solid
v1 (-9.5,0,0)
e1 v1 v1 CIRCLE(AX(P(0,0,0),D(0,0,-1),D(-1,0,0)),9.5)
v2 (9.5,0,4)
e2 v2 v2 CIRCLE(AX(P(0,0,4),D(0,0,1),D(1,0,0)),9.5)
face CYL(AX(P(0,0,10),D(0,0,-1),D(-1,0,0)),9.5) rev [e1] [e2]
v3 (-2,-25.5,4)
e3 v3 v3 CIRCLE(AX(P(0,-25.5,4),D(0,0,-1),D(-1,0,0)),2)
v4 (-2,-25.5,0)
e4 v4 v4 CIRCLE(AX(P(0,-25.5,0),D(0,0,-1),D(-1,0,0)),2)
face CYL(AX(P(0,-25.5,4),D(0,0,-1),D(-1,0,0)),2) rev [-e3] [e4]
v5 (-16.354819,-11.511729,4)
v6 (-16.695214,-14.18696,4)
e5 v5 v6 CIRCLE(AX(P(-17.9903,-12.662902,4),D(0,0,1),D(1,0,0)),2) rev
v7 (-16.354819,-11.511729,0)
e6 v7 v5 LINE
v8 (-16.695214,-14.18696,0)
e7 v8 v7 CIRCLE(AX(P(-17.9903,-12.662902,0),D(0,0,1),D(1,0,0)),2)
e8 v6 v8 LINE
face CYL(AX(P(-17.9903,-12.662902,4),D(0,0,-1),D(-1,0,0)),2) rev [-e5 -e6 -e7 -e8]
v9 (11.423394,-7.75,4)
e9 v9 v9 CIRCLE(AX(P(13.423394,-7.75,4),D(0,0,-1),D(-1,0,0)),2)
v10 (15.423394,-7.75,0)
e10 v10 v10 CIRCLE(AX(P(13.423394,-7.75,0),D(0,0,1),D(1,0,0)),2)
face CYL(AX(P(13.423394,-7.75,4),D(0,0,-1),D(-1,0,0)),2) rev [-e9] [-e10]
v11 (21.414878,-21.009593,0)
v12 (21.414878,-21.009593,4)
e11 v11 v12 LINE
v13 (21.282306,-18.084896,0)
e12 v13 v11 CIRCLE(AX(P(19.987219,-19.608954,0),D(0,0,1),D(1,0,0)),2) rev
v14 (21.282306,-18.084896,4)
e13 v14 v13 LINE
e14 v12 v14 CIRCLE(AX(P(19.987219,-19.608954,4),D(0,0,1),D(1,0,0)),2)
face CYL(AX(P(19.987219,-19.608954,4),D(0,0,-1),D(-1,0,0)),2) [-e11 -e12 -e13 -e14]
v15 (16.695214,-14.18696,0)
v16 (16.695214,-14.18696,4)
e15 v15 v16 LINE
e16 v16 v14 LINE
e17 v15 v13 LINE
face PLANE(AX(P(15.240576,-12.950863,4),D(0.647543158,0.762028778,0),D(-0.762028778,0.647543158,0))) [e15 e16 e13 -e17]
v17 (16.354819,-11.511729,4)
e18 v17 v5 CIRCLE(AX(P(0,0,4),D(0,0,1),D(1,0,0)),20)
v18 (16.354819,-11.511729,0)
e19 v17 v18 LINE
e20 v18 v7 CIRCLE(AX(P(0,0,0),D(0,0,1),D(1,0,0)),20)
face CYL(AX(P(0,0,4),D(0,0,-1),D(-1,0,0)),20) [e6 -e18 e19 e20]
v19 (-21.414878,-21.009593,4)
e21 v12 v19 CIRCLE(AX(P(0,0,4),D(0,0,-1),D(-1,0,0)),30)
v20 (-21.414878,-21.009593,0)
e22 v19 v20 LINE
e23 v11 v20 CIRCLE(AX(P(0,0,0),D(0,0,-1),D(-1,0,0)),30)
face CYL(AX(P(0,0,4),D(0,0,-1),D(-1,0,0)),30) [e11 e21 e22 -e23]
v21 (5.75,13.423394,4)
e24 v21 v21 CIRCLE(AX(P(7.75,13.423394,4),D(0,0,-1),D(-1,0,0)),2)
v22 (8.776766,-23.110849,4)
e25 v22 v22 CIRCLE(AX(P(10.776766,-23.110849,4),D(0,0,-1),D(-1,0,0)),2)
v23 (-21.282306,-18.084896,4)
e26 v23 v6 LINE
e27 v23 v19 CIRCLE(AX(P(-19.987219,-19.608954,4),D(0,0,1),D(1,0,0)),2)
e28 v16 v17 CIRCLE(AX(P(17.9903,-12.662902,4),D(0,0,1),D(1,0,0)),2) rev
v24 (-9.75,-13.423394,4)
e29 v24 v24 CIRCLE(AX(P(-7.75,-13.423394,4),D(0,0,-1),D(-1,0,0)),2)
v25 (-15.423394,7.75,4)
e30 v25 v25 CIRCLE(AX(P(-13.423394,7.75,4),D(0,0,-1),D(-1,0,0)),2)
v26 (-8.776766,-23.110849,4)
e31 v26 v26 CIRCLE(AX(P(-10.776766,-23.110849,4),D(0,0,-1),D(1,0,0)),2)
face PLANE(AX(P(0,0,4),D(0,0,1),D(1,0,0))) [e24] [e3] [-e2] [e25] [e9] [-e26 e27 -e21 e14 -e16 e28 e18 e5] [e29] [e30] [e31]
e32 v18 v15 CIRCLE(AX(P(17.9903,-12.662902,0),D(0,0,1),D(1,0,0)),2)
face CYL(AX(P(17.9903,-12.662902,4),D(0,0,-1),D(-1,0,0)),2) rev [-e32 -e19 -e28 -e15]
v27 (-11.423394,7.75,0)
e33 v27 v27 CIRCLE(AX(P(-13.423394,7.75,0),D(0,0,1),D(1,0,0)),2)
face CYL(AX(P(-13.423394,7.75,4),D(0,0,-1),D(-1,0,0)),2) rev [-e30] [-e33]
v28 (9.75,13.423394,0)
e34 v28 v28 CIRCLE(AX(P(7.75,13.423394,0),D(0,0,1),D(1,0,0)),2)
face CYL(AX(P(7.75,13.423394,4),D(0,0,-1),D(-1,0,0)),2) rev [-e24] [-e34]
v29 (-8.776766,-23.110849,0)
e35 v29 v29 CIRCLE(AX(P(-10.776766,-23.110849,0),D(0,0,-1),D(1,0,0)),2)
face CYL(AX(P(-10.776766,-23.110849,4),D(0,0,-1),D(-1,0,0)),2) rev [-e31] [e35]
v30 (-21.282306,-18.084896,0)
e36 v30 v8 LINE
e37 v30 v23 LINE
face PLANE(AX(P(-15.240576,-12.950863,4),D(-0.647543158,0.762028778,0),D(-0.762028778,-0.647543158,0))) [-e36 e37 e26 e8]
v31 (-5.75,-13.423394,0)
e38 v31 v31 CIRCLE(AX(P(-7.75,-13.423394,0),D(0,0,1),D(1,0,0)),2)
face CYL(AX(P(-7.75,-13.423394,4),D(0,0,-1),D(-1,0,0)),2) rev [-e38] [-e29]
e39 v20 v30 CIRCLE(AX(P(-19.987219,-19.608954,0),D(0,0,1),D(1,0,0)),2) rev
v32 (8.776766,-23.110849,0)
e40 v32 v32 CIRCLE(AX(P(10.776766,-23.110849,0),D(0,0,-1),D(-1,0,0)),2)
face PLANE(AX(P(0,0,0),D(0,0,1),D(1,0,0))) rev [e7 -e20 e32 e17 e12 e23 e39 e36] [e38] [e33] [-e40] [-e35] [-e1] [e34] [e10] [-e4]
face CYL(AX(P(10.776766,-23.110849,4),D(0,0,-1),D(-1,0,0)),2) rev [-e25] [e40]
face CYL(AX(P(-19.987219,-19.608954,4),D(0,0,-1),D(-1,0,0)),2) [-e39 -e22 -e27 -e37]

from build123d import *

# Parameters (mm, degrees)
SKETCH_1_R           = 20
SKETCH_1_R_2         = 2
EXTRUDE_1_DEPTH      = 4
EXTRUDE_START        = -4
EXTRUDE_2_DEPTH      = 4
FILLET_2_R           = 5
FILLET_3_R           = 5
SKETCH_3_R           = 58.160089131
SKETCH_3_R_2         = 39.60449563
CUT_EXTRUDE_1_DEPTH  = 4
FILLET_4_R           = 8
EXTRUDE_3_DEPTH      = 4
SKETCH_5_R           = 2
CUT_EXTRUDE_2_DEPTH  = 4
SKETCH_6_R           = 2
CUT_EXTRUDE_3_DEPTH  = 10
EXTRUDE_4_DEPTH      = 4
EXTRUDE_6_DEPTH      = 4
CUT_EXTRUDE_6_DEPTH  = 4
FILLET_6_R           = 10
FILLET_7_R           = 10
FILLET_8_R           = 10
SKETCH_10_R          = 2
EXTRUDE_7_DEPTH      = 4
SKETCH_11_R          = 55.332509923
SKETCH_11_R_2        = 30
CUT_EXTRUDE_7_DEPTH  = 4
EXTRUDE_8_DEPTH      = 4
SKETCH_13_R          = 2
CUT_EXTRUDE_8_DEPTH  = 4
SKETCH_14_R          = 9.5
CUT_EXTRUDE_9_DEPTH  = 10
SKETCH_15_R          = 2
EXTRUDE_9_DEPTH      = 5
SKETCH_16_R          = 20
SKETCH_16_R_2        = 9.5
EXTRUDE_10_DEPTH     = 4
SKETCH_18_R          = 2
CUT_EXTRUDE_11_DEPTH = 39.776527497
FILLET_9_R           = 2
FILLET_10_R          = 2
CUT_EXTRUDE_START    = -5
SKETCH_19_R          = 2
CUT_EXTRUDE_12_DEPTH = 5


with BuildPart() as part:
    # 草图1 → 凸台-拉伸1 (new body)
    with BuildSketch(Plane.XY):
        Circle(SKETCH_1_R)
        with Locations((-15.5, 0)):
            Circle(SKETCH_1_R_2, mode=Mode.SUBTRACT)
        with Locations((15.5, 0)):
            Circle(SKETCH_1_R_2, mode=Mode.SUBTRACT)
        with Locations((-7.75, 13.423393759)):
            Circle(SKETCH_1_R_2, mode=Mode.SUBTRACT)
        with Locations((-7.75, -13.423393759)):
            Circle(SKETCH_1_R_2, mode=Mode.SUBTRACT)
        with Locations((7.75, -13.423393759)):
            Circle(SKETCH_1_R_2, mode=Mode.SUBTRACT)
        with Locations((7.75, 13.423393759)):
            Circle(SKETCH_1_R_2, mode=Mode.SUBTRACT)
    extrude(amount=EXTRUDE_1_DEPTH)

    # 草图2 → 凸台-拉伸2 (add)
    with BuildSketch(Plane.XY.offset(4).offset(EXTRUDE_START)):
        with BuildLine():
            add(Edge.make_bspline(
                [(-31.652235688, -31.652235688), (-33.388516019, -22.659494294), (-23.392443281, -20.962737075), (-16.1166561, -16.161254448), (-15.240575556, -12.950863166)],
                knots=[0, 0, 0, 0, 0.575012139, 0.86884139, 0.86884139, 0.86884139, 0.86884139], degree=3))
            ThreePointArc((-31.652235688, -31.652235688), (0, -44.76302099), (31.652235688, -31.652235688))
            add(Edge.make_bspline(
                [(31.652235688, -31.652235688), (33.388516019, -22.659494294), (23.392443281, -20.962737075), (16.1166561, -16.161254448), (15.240575556, -12.950863166)],
                knots=[0, 0, 0, 0, 0.575012139, 0.86884139, 0.86884139, 0.86884139, 0.86884139], degree=3))
            ThreePointArc((15.240575556, -12.950863166), (0, -20), (-15.240575556, -12.950863166))
        make_face()
    extrude(amount=EXTRUDE_2_DEPTH)

    # 圆角2
    fillet_2_edges = [part.edges().sort_by_distance(p)[0] for p in [
        (-31.652235688, -31.652235688, 2),
    ]]
    fillet(fillet_2_edges, radius=FILLET_2_R)

    # 圆角3
    fillet_3_edges = [part.edges().sort_by_distance(p)[0] for p in [
        (31.652235688, -31.652235688, 2),
    ]]
    fillet(fillet_3_edges, radius=FILLET_3_R)

    # 草图3 → 切除-拉伸1 (cut)
    with BuildSketch(Plane(origin=(0, 0, 0), x_dir=(-1, 0, 0), z_dir=(0, 0, -1))):
        Circle(SKETCH_3_R)
        Circle(SKETCH_3_R_2, mode=Mode.SUBTRACT)
    extrude(amount=-CUT_EXTRUDE_1_DEPTH, mode=Mode.SUBTRACT)

    # 圆角4
    fillet_4_edges = [part.edges().sort_by_distance(p)[0] for p in [
        (30.87581987, -24.803221997, 2),
        (-30.87581987, -24.803221997, 2),
    ]]
    fillet(fillet_4_edges, radius=FILLET_4_R)

    # 草图4 → 凸台-拉伸3 (add)
    with BuildSketch(Plane(origin=(0, 0, 0), x_dir=(-1, 0, 0), z_dir=(0, 0, -1))):
        with BuildLine():
            Line((-22.183787779, -32.808468935), (-22.405322857, -33.136105801))
            ThreePointArc((-22.405322857, -33.136105801), (0.038199329, -39.99998176), (22.468570811, -33.093251967))
            Line((22.468570811, -33.093251967), (22.183787779, -32.808468935))
            ThreePointArc((22.183787779, -32.808468935), (0, -39.60449563), (-22.183787779, -32.808468935))
        make_face()
    extrude(amount=-EXTRUDE_3_DEPTH)

    # 草图5 → 切除-拉伸2 (cut)
    with BuildSketch(Plane(origin=(0, 0, 0), x_dir=(-1, 0, 0), z_dir=(0, 0, -1))):
        with Locations((-15.848184815, -33.986542014)):
            Circle(SKETCH_5_R)
        with Locations((0, -37.5)):
            Circle(SKETCH_5_R)
        with Locations(Location((15.848184815, -33.986542014, 0), (0, 0, 180))):
            Circle(SKETCH_5_R)
    extrude(amount=-CUT_EXTRUDE_2_DEPTH, mode=Mode.SUBTRACT)

    # 草图6 → 切除-拉伸3 (cut)
    with BuildSketch(Plane(origin=(0, 0, 0), x_dir=(-1, 0, 0), z_dir=(0, 0, -1))):
        with Locations((0.038199329, -29.99998176)):
            Circle(SKETCH_6_R)
    extrude(amount=-CUT_EXTRUDE_3_DEPTH, mode=Mode.SUBTRACT)

    # 草图7 → 凸台-拉伸4 (add)
    with BuildSketch(Plane.XY.offset(4)):
        with BuildLine():
            Line((-22.468570811, -33.093251967), (-23.907156981, -34.531838137))
            ThreePointArc((-23.907156981, -34.531838137), (-0.231167262, -41.999363825), (23.525589, -34.792911091))
            Line((23.525589, -34.792911091), (22.405322857, -33.136105801))
            Line((22.405322857, -33.136105801), (22.183787779, -32.808468935))
            ThreePointArc((22.183787779, -32.808468935), (0, -39.60449563), (-22.183787779, -32.808468935))
            Line((-22.183787779, -32.808468935), (-22.468570811, -33.093251967))
        make_face()
    extrude(amount=-EXTRUDE_4_DEPTH)

    # 草图8 → 凸台-拉伸6 (add)
    with BuildSketch(Plane(origin=(0, 0, 0), x_dir=(-1, 0, 0), z_dir=(0, 0, -1))):
        with BuildLine():
            Line((-25.678439695, -25.558394246), (-20.516854663, -32.863070329))
            Line((-20.516854663, -32.863070329), (-23.525589, -34.792911091))
            add(Edge.make_bspline(
                [(-23.525589, -34.792911091), (-26.001835591, -30.056258517), (-25.678439695, -25.558394246)],
                knots=[0, 0, 0, 0.47951431, 0.47951431, 0.47951431], degree=2))
        make_face()
        with BuildLine():
            Line((20.516854663, -32.863070329), (23.525589, -34.792911091))
            add(Edge.make_bspline(
                [(23.525589, -34.792911091), (26.001835591, -30.056258517), (25.678439695, -25.558394246)],
                knots=[0, 0, 0, 0.47951431, 0.47951431, 0.47951431], degree=2))
            Line((25.678439695, -25.558394246), (20.516854663, -32.863070329))
        make_face()
    extrude(amount=-EXTRUDE_6_DEPTH)

    # 草图9 → 切除-拉伸6 (cut)
    with BuildSketch(Plane(origin=(0, 0, 0), x_dir=(-1, 0, 0), z_dir=(0, 0, -1))):
        Polygon((23.742659966, -34.367341122), (22.906265437, -35.20373565), (24.433492861, -34.374984505), align=None)
    extrude(amount=-CUT_EXTRUDE_6_DEPTH, mode=Mode.SUBTRACT)

    # 圆角6
    fillet_6_edges = [part.edges().sort_by_distance(p)[0] for p in [
        (23.525589, -34.792911091, 2),
    ]]
    fillet(fillet_6_edges, radius=FILLET_6_R)

    # 圆角7
    # the kernel refuses this fillet: 10 mm, written as the material it takes off along each edge
    with BuildSketch(Plane(origin=(-23.742659966, -34.367341122, 10.292446297), x_dir=(0.7071067812003878, -0.7071067811727072, 0), z_dir=(0, 0, -1))) as fillet_7_piece_1:
        with BuildLine():
            CenterArc((1.956172782, -9.970053017), FILLET_7_R, 94.435296014, 20.980736708)
            Line((-2.335706132, -0.937900705), (-2.42154371, -0.757257658))
            ThreePointArc((-2.42154371, -0.757257658), (-1.256201499, -0.248323162), (-0.06365122, 0.189600955))
            Line((-0.06365122, 0.189600955), (0, 0.2))
            ThreePointArc((0, 0.2), (0.591420243, 0.2), (1.16737384, 0.19940106))
            Line((1.16737384, 0.19940106), (1.182840486, 0))
        make_face()
    extrude(amount=16.584892581, mode=Mode.SUBTRACT)

    # 圆角8
    fillet_8_edges = [part.edges().sort_by_distance(p)[0] for p in [
        (-22.906265437, -35.20373565, 2),
    ]]
    fillet(fillet_8_edges, radius=FILLET_8_R)

    # 草图10 → 凸台-拉伸7 (add)
    with BuildSketch(Plane(origin=(0, 0, 0), x_dir=(-1, 0, 0), z_dir=(0, 0, -1))):
        with Locations((0.038199329, -29.99998176)):
            Circle(SKETCH_10_R)
        with Locations((0, -37.5)):
            Circle(SKETCH_10_R)
        with Locations((15.848184815, -33.986542014)):
            Circle(SKETCH_10_R)
        with Locations((-15.848184815, -33.986542014)):
            Circle(SKETCH_10_R)
    extrude(amount=-EXTRUDE_7_DEPTH)

    # 草图11 → 切除-拉伸7 (cut)
    with BuildSketch(Plane(origin=(0, 0, 0), x_dir=(-1, 0, 0), z_dir=(0, 0, -1))):
        Circle(SKETCH_11_R)
        Circle(SKETCH_11_R_2, mode=Mode.SUBTRACT)
    extrude(amount=-CUT_EXTRUDE_7_DEPTH, mode=Mode.SUBTRACT)

    # 草图12 → 凸台-拉伸8 (add)
    with BuildSketch(Plane(origin=(0, 0, 0), x_dir=(-1, 0, 0), z_dir=(0, 0, -1))):
        with BuildLine():
            Line((-15.240575556, -12.950863166), (-22.860863333, -19.426294749))
            ThreePointArc((-22.860863333, -19.426294749), (-19.109156974, -23.126610641), (-14.767877105, -26.1134028))
            Line((-14.767877105, -26.1134028), (-15.240575556, -12.950863166))
        make_face()
        with BuildLine():
            Line((15.240575556, -12.950863166), (14.767877105, -26.1134028))
            ThreePointArc((14.767877105, -26.1134028), (19.109156974, -23.126610641), (22.860863333, -19.426294749))
            Line((22.860863333, -19.426294749), (15.240575556, -12.950863166))
        make_face()
    extrude(amount=-EXTRUDE_8_DEPTH)

    # 草图13 → 切除-拉伸8 (cut)
    with BuildSketch(Plane(origin=(0, 0, 0), x_dir=(-1, 0, 0), z_dir=(0, 0, -1))):
        with Locations((-10.776765674, -23.110848569)):
            Circle(SKETCH_13_R)
        with Locations((0, -25.5)):
            Circle(SKETCH_13_R)
        with Locations(Location((10.776765674, -23.110848569, 0), (0, 0, 180))):
            Circle(SKETCH_13_R)
    extrude(amount=-CUT_EXTRUDE_8_DEPTH, mode=Mode.SUBTRACT)

    # 草图14 → 切除-拉伸9 (cut)
    with BuildSketch(Plane(origin=(0, 0, 0), x_dir=(-1, 0, 0), z_dir=(0, 0, -1))):
        Circle(SKETCH_14_R)
    extrude(amount=-CUT_EXTRUDE_9_DEPTH, mode=Mode.SUBTRACT)

    # 草图15 → 凸台-拉伸9 (add)
    with BuildSketch(Plane(origin=(0, 0, 0), x_dir=(-1, 0, 0), z_dir=(0, 0, -1))):
        with Locations(Location((0, 15.5, 0), (0, 0, 180))):
            Circle(SKETCH_15_R)
        with Locations(Location((0, -15.5, 0), (0, 0, 180))):
            Circle(SKETCH_15_R)
        with Locations(Location((-13.423393758, 7.75, 0), (0, 0, 180))):
            Circle(SKETCH_15_R)
        with Locations(Location((13.423393759, 7.75, 0), (0, 0, 180))):
            Circle(SKETCH_15_R)
        with Locations(Location((13.423393759, -7.75, 0), (0, 0, 180))):
            Circle(SKETCH_15_R)
        with Locations(Location((-13.423393758, -7.75, 0), (0, 0, 180))):
            Circle(SKETCH_15_R)
    extrude(amount=EXTRUDE_9_DEPTH)

    # 草图16 → 凸台-拉伸10 (add)
    with BuildSketch(Plane.XY.offset(4).offset(EXTRUDE_START)):
        Circle(SKETCH_16_R)
        with Locations(Location((0, 0, 0), (0, 0, 180))):
            Circle(SKETCH_16_R_2, mode=Mode.SUBTRACT)
    extrude(amount=EXTRUDE_10_DEPTH)

    # 草图18 → 切除-拉伸11 (cut, through all)
    with BuildSketch(Plane(origin=(0, 0, -5), x_dir=(-1, 0, 0), z_dir=(0, 0, -1))):
        with Locations((13.423393759, 7.75)):
            Circle(SKETCH_18_R)
        with Locations((7.75, -13.423393759)):
            Circle(SKETCH_18_R)
        with Locations((-13.423393759, -7.75)):
            Circle(SKETCH_18_R)
        with Locations((-7.75, 13.423393759)):
            Circle(SKETCH_18_R)
    extrude(amount=-CUT_EXTRUDE_11_DEPTH, mode=Mode.SUBTRACT)

    # 圆角9
    fillet_9_edges = [part.edges().sort_by_distance(p)[0] for p in [
        (-15.240575556, -12.950863166, 2),
        (15.240575556, -12.950863166, 2),
    ]]
    fillet(fillet_9_edges, radius=FILLET_9_R)

    # 圆角10
    fillet_10_edges = [part.edges().sort_by_distance(p)[0] for p in [
        (22.860863333, -19.426294749, 2),
        (-22.860863333, -19.426294749, 2),
    ]]
    fillet(fillet_10_edges, radius=FILLET_10_R)

    # 草图19 → 切除-拉伸12 (cut)
    with BuildSketch(Plane(origin=(0, 0, -5), x_dir=(-1, 0, 0), z_dir=(0, 0, -1)).offset(CUT_EXTRUDE_START)):
        with Locations((0, 15.5)):
            Circle(SKETCH_19_R)
        with Locations((0, -15.5)):
            Circle(SKETCH_19_R)
        with Locations((13.423393759, -7.75)):
            Circle(SKETCH_19_R)
        with Locations((-13.423393758, 7.75)):
            Circle(SKETCH_19_R)
    extrude(amount=CUT_EXTRUDE_12_DEPTH, mode=Mode.SUBTRACT)


solid = part.part
